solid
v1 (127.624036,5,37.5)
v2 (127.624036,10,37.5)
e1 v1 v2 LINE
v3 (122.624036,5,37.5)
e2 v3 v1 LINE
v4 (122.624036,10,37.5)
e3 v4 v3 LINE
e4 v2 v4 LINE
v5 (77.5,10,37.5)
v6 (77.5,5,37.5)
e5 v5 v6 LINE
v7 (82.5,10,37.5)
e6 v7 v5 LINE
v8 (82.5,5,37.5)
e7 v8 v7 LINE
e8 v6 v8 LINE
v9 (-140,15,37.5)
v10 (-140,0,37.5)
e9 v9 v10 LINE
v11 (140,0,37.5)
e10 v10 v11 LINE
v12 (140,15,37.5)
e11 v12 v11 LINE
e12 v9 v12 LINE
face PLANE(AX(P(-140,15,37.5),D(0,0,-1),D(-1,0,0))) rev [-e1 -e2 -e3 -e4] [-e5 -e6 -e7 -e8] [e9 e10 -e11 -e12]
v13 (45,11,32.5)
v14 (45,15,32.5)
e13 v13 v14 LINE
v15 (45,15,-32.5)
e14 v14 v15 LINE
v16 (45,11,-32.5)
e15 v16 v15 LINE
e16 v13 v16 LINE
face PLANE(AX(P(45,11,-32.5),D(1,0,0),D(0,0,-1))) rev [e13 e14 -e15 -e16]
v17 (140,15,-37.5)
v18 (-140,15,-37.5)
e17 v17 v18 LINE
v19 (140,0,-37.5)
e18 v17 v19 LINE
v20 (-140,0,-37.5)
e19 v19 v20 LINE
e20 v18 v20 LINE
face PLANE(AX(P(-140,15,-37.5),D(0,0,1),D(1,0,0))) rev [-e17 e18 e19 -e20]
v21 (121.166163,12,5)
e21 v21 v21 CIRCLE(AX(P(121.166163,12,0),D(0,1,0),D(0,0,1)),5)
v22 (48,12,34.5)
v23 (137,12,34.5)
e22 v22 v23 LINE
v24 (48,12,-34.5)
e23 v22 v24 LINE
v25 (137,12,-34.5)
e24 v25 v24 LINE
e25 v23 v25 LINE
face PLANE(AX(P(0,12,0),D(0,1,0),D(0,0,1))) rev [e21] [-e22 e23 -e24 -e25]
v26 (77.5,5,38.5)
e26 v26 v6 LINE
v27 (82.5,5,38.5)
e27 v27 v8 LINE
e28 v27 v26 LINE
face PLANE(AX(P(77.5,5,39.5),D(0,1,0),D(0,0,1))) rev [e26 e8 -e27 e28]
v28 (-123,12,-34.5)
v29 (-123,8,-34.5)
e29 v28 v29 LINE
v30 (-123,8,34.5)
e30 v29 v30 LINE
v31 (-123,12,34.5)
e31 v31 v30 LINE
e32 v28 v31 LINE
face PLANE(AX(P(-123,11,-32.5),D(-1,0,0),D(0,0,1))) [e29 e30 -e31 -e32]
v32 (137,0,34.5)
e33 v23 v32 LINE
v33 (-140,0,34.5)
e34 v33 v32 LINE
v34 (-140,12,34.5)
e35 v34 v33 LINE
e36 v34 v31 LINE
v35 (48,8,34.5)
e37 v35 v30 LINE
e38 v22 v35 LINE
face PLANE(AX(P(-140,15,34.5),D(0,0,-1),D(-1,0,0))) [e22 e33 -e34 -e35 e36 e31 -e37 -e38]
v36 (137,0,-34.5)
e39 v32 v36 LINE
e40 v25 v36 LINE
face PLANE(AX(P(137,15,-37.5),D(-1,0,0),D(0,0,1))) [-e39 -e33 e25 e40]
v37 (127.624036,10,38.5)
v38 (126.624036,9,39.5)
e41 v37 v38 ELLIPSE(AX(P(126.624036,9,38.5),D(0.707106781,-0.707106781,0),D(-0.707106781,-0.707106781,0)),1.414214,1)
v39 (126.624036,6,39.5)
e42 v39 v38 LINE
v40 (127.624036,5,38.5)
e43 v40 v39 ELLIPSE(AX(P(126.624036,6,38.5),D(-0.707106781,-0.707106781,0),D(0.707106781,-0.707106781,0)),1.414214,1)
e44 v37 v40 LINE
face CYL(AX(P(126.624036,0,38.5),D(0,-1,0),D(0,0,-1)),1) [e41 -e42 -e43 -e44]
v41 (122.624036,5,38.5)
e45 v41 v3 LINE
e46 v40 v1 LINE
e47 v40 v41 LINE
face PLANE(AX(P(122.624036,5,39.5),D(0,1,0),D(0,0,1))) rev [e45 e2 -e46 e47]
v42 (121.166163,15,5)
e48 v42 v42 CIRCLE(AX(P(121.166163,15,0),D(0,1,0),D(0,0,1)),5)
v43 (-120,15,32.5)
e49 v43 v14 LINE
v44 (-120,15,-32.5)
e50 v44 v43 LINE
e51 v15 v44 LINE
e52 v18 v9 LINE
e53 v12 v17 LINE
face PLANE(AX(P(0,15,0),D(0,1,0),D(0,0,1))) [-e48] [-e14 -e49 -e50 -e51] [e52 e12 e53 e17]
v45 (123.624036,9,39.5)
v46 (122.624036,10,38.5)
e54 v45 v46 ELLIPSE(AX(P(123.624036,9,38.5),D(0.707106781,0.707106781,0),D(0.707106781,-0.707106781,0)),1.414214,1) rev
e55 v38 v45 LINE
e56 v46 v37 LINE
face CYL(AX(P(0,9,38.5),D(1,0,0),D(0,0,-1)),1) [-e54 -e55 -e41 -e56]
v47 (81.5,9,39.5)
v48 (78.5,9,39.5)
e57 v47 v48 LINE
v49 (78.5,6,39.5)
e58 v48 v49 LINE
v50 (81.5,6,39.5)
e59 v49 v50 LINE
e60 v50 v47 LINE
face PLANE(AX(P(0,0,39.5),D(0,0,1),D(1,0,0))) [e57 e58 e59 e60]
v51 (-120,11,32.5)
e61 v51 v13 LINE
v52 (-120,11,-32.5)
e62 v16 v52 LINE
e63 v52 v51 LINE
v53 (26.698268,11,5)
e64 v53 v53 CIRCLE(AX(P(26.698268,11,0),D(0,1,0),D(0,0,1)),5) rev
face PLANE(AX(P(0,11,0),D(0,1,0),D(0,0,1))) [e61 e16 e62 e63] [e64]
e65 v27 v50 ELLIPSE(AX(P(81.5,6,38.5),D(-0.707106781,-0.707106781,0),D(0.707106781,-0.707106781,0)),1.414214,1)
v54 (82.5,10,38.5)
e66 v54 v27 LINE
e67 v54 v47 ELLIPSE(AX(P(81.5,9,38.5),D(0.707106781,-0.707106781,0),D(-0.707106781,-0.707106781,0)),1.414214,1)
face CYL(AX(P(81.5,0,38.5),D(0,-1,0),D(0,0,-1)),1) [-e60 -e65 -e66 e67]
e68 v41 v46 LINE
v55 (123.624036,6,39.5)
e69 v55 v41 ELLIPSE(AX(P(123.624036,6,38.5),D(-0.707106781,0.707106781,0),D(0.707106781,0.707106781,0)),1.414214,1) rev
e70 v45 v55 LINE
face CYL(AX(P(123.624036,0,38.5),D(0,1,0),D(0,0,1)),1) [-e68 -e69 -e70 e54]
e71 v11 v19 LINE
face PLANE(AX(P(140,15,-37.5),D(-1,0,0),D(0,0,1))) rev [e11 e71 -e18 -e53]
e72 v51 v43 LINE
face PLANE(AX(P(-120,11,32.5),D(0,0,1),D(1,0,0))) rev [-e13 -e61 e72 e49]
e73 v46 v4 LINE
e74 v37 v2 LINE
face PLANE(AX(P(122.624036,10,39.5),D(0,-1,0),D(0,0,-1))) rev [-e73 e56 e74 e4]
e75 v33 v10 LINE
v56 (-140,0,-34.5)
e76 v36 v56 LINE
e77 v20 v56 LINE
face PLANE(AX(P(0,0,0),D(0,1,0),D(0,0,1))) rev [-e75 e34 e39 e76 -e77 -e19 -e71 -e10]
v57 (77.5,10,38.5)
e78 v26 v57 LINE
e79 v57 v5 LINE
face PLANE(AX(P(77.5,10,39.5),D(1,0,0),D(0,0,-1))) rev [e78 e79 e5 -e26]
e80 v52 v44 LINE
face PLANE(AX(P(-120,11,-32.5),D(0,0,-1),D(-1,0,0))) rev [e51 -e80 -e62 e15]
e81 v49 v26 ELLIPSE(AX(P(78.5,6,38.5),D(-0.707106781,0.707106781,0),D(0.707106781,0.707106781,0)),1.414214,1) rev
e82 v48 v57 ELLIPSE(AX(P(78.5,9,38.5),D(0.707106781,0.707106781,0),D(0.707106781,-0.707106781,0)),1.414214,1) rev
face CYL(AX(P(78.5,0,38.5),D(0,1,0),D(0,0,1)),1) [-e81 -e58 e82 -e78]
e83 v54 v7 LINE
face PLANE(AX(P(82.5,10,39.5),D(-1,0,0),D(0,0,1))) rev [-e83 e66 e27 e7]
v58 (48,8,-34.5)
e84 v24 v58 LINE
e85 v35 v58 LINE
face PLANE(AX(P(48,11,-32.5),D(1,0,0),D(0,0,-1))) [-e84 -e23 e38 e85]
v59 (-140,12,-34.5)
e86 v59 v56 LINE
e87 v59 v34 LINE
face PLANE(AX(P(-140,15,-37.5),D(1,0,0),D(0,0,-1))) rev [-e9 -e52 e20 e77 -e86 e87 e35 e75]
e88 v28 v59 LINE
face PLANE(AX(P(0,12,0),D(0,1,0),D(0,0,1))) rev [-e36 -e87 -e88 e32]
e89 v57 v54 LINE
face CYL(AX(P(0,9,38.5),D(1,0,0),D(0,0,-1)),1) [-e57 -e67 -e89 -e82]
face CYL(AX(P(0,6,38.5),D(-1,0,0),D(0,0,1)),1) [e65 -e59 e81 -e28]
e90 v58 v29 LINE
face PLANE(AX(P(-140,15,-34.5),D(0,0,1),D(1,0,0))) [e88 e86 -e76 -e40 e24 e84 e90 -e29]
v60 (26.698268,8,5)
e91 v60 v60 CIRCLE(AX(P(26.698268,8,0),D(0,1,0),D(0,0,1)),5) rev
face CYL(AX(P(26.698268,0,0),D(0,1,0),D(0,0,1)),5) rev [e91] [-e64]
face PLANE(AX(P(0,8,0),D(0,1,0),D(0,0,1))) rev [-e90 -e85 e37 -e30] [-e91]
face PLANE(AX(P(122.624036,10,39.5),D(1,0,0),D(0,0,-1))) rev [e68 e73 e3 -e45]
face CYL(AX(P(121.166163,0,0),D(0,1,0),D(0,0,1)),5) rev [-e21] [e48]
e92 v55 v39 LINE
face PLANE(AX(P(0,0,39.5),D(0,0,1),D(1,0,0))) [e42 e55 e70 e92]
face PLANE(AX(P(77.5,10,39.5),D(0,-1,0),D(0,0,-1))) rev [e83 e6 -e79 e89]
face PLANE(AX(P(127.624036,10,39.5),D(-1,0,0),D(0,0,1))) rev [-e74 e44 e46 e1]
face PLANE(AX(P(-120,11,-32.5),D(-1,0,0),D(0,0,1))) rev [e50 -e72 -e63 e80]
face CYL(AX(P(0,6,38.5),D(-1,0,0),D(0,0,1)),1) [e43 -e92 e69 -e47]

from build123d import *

# Parameters (mm, degrees)
SKETCH1_W            = 280
SKETCH1_H            = 75
BOSS_EXTRUDE1_DEPTH  = 15
SKETCH8_R            = 5
CUT_EXTRUDE4_DEPTH   = 146.709471209
SKETCH10_R           = 5
CUT_EXTRUDE6_DEPTH   = 146.709471209
SKETCH9_W            = 165
SKETCH9_H            = 65
CUT_EXTRUDE5_DEPTH   = 4
SHELL2_OUTLINE_W     = 277
SHELL2_OUTLINE_H     = 69
SHELL2_OUTLINE_R     = 5
SHELL2_DEPTH         = 8
SHELL2_START         = 8
SHELL2_2_OUTLINE_W   = 17
SHELL2_2_OUTLINE_H   = 69
SHELL2_2_OUTLINE_W_2 = 89
SHELL2_2_OUTLINE_R   = 5
SHELL2_2_DEPTH       = 4
SKETCH11_W           = 5
SKETCH11_H           = 5
BOSS_EXTRUDE4_DEPTH  = 2
FILLET1_R            = 1


# Read off the part's stored shape, not the designer's step: Shell2
with BuildPart() as part:
    # Sketch1 → Boss-Extrude1 (new body)
    with BuildSketch(Plane(origin=(0, 0, 0), x_dir=(1, 0, 0), z_dir=(0, 1, 0))):
        Rectangle(SKETCH1_W, SKETCH1_H)
    extrude(amount=BOSS_EXTRUDE1_DEPTH)

    # Sketch8 → Cut-Extrude4 (cut, through all)
    with BuildSketch(Plane(origin=(0, 15, 0), x_dir=(1, 0, 0), z_dir=(0, 1, 0))):
        with Locations(Location((121.166163263, 0, 0), (0, 0, 270))):
            Circle(SKETCH8_R)
    extrude(amount=-CUT_EXTRUDE4_DEPTH, mode=Mode.SUBTRACT)

    # Sketch10 → Cut-Extrude6 (cut, through all)
    with BuildSketch(Plane(origin=(0, 15, 0), x_dir=(1, 0, 0), z_dir=(0, 1, 0))):
        with Locations(Location((26.698268473, 0, 0), (0, 0, 270))):
            Circle(SKETCH10_R)
    extrude(amount=-CUT_EXTRUDE6_DEPTH, mode=Mode.SUBTRACT)

    # Sketch9 → Cut-Extrude5 (cut)
    with BuildSketch(Plane(origin=(0, 15, 0), x_dir=(1, 0, 0), z_dir=(0, 1, 0))):
        with Locations((-37.5, 0)):
            Rectangle(SKETCH9_W, SKETCH9_H)
    extrude(amount=-CUT_EXTRUDE5_DEPTH, mode=Mode.SUBTRACT)

    # Shell2 outline → Shell2 (cut)
    with BuildSketch(Plane(origin=(0, 0, 0), x_dir=(1, 0, 0), z_dir=(0, 1, 0))):
        with Locations((-1.5, 0)):
            Rectangle(SHELL2_OUTLINE_W, SHELL2_OUTLINE_H)
        with Locations((26.698268473, 0)):
            Circle(SHELL2_OUTLINE_R, mode=Mode.SUBTRACT)
        with Locations((121.166163263, 0)):
            Circle(SHELL2_OUTLINE_R, mode=Mode.SUBTRACT)
    extrude(amount=SHELL2_DEPTH, mode=Mode.SUBTRACT)

    # Shell2 2 outline → Shell2 2 (cut)
    # profile 1 of 2: a face of its own
    with BuildSketch(Plane(origin=(0, 0, 0), x_dir=(1, 0, 0), z_dir=(0, 1, 0)).offset(SHELL2_START)):
        with Locations((-131.5, 0)):
            Rectangle(SHELL2_2_OUTLINE_W, SHELL2_2_OUTLINE_H)
    # profile 2 of 2: a face of its own
    with BuildSketch(Plane(origin=(0, 0, 0), x_dir=(1, 0, 0), z_dir=(0, 1, 0)).offset(SHELL2_START)):
        with Locations((92.5, 0)):
            Rectangle(SHELL2_2_OUTLINE_W_2, SHELL2_2_OUTLINE_H)
        with Locations((121.166163263, 0)):
            Circle(SHELL2_2_OUTLINE_R, mode=Mode.SUBTRACT)
    extrude(amount=SHELL2_2_DEPTH, mode=Mode.SUBTRACT)

    # Sketch11 → Boss-Extrude4 (add)
    with BuildSketch(Plane.XY.offset(37.5)):
        with Locations((80, 7.5)):
            Rectangle(SKETCH11_W, SKETCH11_H)
        with Locations((125.124035555, 7.5)):
            Rectangle(SKETCH11_W, SKETCH11_H)
    extrude(amount=BOSS_EXTRUDE4_DEPTH)

    # Fillet1
    fillet1_edges = [part.edges().sort_by_distance(p)[0] for p in [
        (82.5, 7.5, 39.5),
        (80, 10, 39.5),
        (77.5, 7.5, 39.5),
        (80, 5, 39.5),
        (127.624035555, 7.5, 39.5),
        (125.124035555, 10, 39.5),
        (122.624035555, 7.5, 39.5),
        (125.124035555, 5, 39.5),
    ]]
    fillet(fillet1_edges, radius=FILLET1_R)


solid = part.part
